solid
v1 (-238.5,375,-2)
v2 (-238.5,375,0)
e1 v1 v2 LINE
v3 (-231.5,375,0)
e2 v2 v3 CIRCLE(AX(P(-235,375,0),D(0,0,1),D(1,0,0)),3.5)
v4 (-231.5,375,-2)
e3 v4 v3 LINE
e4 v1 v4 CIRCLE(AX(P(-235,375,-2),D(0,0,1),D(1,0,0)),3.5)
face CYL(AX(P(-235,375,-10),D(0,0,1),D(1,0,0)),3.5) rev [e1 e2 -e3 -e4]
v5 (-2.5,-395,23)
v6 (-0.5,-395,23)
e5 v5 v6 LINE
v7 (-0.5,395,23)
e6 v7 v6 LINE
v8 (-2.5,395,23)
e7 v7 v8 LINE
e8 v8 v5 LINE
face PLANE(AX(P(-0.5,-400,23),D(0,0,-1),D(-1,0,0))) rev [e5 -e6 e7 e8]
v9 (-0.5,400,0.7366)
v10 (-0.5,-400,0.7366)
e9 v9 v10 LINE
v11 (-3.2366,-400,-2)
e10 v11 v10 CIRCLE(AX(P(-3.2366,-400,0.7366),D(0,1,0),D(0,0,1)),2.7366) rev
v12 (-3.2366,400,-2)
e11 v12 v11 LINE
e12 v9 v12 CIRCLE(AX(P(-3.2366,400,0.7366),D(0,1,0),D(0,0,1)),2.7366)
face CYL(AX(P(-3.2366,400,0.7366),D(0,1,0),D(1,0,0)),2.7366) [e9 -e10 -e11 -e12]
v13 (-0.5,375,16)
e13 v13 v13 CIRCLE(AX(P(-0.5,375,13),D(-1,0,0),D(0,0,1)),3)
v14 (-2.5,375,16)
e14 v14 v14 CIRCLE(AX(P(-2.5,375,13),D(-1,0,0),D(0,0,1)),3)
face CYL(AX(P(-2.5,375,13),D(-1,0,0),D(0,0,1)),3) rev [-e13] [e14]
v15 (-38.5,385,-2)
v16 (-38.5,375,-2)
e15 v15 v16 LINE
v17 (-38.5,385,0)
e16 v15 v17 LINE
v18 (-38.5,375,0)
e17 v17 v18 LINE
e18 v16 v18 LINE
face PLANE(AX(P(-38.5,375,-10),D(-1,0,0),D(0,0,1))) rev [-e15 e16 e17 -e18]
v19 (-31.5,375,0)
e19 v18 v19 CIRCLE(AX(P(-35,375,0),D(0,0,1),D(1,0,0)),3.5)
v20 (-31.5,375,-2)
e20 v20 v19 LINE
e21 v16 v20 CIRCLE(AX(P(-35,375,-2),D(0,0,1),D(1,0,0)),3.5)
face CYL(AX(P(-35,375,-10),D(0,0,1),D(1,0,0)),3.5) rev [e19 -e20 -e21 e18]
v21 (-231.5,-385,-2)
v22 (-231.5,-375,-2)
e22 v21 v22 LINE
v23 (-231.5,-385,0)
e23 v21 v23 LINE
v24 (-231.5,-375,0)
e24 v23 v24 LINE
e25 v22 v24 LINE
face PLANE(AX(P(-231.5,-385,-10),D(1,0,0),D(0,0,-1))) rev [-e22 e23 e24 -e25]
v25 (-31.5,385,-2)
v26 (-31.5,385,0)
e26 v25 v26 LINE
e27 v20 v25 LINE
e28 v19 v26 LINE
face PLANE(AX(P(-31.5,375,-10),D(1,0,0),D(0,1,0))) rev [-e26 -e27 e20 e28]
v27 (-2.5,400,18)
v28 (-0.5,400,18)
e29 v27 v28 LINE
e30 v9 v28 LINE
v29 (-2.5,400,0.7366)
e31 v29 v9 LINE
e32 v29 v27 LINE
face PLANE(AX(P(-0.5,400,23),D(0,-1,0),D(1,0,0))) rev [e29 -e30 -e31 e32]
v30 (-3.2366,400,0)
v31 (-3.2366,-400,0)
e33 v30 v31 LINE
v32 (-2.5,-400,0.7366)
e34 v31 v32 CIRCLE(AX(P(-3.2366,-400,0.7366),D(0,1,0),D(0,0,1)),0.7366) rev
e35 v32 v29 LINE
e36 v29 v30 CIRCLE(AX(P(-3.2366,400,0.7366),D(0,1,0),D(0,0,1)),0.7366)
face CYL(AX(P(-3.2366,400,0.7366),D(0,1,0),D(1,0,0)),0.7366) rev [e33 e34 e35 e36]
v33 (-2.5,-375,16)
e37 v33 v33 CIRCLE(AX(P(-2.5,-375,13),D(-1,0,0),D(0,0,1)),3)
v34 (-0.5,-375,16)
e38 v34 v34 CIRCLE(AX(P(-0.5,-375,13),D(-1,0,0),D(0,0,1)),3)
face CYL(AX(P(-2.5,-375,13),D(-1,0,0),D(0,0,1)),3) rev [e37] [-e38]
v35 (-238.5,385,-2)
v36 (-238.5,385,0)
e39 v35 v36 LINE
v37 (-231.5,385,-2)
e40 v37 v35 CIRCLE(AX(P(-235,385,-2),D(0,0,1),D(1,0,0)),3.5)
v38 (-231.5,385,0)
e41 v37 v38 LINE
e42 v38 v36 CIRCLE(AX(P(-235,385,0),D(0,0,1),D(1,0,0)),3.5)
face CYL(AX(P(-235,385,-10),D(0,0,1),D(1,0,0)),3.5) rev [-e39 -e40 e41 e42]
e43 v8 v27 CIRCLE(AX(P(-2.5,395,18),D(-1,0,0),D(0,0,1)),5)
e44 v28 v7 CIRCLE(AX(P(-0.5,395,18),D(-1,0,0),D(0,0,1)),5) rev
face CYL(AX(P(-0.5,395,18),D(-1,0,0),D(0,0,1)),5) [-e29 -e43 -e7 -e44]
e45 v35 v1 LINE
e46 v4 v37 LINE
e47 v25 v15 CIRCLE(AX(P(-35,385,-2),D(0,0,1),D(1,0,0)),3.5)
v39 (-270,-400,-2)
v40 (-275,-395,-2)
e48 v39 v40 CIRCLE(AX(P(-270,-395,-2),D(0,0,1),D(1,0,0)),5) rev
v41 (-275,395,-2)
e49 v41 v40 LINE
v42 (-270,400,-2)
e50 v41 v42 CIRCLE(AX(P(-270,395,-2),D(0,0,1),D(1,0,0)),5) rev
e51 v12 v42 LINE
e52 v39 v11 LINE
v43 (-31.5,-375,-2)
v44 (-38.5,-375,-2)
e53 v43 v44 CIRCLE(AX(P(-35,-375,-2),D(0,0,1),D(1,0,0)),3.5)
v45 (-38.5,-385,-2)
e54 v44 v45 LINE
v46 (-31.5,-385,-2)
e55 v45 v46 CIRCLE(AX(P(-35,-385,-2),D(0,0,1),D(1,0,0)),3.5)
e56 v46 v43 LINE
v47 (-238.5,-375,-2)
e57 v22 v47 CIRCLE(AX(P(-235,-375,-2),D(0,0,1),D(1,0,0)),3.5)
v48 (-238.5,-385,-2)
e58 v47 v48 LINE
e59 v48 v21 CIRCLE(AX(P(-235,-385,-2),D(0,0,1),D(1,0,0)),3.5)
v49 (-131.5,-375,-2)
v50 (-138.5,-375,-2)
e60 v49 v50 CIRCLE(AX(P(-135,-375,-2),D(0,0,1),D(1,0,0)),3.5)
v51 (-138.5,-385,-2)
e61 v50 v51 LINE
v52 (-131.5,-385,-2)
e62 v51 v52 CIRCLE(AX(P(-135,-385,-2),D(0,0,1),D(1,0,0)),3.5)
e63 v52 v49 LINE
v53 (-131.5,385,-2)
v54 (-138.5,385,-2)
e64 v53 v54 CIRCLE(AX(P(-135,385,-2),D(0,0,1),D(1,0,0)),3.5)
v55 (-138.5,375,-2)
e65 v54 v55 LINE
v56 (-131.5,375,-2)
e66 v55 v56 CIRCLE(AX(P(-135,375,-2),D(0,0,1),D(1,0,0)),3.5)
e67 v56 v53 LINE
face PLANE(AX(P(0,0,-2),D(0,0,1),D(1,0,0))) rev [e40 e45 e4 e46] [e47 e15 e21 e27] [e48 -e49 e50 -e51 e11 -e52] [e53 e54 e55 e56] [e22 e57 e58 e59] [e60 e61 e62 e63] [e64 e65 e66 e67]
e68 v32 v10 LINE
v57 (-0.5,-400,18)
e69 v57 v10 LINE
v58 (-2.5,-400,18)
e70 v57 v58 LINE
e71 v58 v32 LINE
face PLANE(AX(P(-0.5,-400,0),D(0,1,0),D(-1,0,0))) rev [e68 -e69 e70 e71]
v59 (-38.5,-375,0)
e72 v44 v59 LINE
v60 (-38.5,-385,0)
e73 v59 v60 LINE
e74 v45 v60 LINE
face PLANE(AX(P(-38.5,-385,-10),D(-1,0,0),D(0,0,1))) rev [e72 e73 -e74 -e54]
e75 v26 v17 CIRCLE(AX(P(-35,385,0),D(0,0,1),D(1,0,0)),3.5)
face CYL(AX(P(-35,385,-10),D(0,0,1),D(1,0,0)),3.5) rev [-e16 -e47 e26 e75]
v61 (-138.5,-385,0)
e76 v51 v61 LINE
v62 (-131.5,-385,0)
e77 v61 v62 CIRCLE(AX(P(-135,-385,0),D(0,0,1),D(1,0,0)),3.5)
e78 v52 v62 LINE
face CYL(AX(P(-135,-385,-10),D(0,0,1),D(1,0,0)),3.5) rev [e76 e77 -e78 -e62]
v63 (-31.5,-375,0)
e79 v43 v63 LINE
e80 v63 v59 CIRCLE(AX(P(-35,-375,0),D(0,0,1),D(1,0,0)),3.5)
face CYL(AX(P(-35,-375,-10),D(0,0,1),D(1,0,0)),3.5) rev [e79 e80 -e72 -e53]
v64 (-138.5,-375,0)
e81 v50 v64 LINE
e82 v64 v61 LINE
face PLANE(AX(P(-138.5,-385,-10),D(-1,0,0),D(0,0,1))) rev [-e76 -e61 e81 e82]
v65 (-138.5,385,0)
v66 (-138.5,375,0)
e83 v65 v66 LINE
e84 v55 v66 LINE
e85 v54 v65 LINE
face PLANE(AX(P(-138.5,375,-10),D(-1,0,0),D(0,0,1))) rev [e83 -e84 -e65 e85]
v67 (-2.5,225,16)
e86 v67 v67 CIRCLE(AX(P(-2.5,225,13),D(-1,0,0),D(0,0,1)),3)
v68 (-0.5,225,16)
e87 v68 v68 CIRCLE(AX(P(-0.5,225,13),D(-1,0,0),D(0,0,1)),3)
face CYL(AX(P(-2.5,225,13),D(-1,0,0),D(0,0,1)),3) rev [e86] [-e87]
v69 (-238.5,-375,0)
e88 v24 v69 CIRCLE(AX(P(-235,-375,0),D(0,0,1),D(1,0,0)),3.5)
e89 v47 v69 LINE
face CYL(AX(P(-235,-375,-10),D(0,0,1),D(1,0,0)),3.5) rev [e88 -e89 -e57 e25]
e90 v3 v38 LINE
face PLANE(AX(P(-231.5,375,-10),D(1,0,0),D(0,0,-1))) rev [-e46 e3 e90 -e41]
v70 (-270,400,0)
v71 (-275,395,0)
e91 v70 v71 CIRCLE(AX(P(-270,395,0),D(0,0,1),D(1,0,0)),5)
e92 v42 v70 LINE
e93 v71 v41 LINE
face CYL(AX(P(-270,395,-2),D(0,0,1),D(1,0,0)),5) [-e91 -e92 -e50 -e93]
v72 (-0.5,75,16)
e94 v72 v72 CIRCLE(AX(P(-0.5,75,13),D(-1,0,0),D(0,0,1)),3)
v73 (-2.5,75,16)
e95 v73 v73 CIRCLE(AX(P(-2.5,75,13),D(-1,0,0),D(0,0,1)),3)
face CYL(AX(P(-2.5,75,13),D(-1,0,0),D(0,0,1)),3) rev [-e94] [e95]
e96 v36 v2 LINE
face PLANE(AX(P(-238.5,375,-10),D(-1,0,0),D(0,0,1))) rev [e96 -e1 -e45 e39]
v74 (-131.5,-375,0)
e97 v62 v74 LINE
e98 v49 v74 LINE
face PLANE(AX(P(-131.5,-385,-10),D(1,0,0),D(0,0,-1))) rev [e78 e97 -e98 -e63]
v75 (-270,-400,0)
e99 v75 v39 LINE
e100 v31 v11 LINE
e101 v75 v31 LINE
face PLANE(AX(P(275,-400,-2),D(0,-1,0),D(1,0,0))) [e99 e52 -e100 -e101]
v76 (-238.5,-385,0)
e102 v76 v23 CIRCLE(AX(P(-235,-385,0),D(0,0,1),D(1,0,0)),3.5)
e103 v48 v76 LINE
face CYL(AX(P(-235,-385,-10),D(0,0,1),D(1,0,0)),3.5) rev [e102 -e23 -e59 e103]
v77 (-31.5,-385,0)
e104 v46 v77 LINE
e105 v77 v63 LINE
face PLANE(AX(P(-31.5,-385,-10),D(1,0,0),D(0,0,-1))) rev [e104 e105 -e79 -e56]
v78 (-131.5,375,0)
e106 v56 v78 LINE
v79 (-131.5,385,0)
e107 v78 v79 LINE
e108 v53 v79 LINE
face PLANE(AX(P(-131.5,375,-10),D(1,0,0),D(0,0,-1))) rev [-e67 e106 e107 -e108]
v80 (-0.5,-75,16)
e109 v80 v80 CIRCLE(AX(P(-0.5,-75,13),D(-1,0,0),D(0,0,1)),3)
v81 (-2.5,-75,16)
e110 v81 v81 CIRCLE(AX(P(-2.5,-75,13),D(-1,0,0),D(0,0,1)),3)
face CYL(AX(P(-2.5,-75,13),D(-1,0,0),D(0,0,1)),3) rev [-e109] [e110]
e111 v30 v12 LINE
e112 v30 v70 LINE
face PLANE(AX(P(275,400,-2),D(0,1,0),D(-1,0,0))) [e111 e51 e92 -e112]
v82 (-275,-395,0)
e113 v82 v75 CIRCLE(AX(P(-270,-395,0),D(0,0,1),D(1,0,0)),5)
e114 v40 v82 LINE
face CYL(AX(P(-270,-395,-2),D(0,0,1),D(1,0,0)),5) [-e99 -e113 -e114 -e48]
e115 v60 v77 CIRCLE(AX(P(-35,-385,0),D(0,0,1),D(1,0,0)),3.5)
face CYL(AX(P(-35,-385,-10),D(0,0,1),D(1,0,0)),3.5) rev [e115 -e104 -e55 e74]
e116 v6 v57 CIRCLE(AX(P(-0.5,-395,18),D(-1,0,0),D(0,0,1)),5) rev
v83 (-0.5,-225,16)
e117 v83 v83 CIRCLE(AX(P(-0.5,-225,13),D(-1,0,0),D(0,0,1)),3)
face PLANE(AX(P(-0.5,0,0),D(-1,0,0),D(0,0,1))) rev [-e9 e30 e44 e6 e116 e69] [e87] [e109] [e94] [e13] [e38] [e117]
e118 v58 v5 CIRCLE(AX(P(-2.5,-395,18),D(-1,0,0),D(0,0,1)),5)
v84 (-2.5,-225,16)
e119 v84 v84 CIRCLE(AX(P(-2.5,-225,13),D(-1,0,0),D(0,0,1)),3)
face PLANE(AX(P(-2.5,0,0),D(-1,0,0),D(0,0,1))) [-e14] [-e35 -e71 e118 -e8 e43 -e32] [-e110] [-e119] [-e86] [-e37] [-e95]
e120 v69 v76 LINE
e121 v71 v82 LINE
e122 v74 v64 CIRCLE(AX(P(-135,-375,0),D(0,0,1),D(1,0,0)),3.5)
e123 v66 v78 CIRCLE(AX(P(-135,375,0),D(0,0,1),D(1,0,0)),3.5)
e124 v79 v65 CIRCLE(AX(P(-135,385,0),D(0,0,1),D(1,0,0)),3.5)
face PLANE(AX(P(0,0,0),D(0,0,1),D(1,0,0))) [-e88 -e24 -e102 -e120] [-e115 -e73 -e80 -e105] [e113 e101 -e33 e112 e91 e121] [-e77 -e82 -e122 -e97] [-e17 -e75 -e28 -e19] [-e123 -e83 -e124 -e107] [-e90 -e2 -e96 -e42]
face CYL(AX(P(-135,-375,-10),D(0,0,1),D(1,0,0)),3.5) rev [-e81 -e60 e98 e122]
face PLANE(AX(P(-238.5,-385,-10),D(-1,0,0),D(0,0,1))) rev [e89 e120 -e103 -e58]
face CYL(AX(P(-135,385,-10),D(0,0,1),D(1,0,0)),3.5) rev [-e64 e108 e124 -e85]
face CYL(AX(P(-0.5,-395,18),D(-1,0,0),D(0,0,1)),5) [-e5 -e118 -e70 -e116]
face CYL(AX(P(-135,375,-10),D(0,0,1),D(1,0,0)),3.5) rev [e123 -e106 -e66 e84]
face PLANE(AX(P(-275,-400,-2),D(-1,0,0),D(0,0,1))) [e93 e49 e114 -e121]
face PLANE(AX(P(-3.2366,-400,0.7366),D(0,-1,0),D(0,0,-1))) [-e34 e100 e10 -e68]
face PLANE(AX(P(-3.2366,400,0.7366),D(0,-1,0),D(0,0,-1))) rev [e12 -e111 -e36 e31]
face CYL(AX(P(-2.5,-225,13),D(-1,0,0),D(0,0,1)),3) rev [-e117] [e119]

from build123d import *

# Parameters (mm, degrees)
SKETCH_1_W                       = 550
SKETCH_1_H                       = 800
SM_BASE_FLANGE_1_DEPTH           = 2
SKETCH_6_W                       = 40
SKETCH_6_H                       = 130
CUT_EXTRUDE_1_DEPTH              = 10
FILLET_1_R                       = 5
SKETCH_7_W                       = 1
SKETCH_7_H                       = 845.505579408
CUT_EXTRUDE_2_DEPTH              = 10
SKETCH_8_W                       = 313.779033263
SKETCH_8_H                       = 811.185879887
CUT_EXTRUDE_3_DEPTH              = 10
SM_EDGE_FLANGE_1_STRIP_W         = 9.4732
SM_EDGE_FLANGE_1_STRIP_H         = 2
SM_EDGE_FLANGE_1_STRIP_CUT_DEPTH = 800
SM_EDGE_FLANGE_1_DEPTH           = 800
FILLET_2_R                       = 5
HOLE_WIZARD_7_0_7_1_D            = 7
CUT_EXTRUDE_4_DEPTH              = 10
HOLE_WIZARD_6_0_6_1_D            = 6
PATTERN_LINEAR_1_COUNT           = 6
PATTERN_LINEAR_1_PITCH           = 150


# Sheet-metal steps are written as plain solids
with BuildPart() as part:
    # Sketch 1 → 基体-法兰1 (new body)
    with BuildSketch(Plane.XY):
        Rectangle(SKETCH_1_W, SKETCH_1_H)
    extrude(amount=-SM_BASE_FLANGE_1_DEPTH)

    # 草图6 → 切除-拉伸1 (cut)
    with BuildSketch(Plane.XY):
        with Locations((255, 335)):
            Rectangle(SKETCH_6_W, SKETCH_6_H)
        with Locations((255, -335)):
            Rectangle(SKETCH_6_W, SKETCH_6_H)
    extrude(amount=-CUT_EXTRUDE_1_DEPTH, mode=Mode.SUBTRACT)

    # 圆角1
    fillet_1_edges = [part.edges().sort_by_distance(p)[0] for p in [
        (275, 270, -1),
        (235, 270, -1),
        (235, 400, -1),
        (275, -270, -1),
        (235, -400, -1),
        (235, -270, -1),
        (-275, 400, -1),
        (-275, -400, -1),
    ]]
    fillet(fillet_1_edges, radius=FILLET_1_R)

    # 草图7 → 切除-拉伸2 (cut)
    with BuildSketch(Plane.XY):
        Rectangle(SKETCH_7_W, SKETCH_7_H)
    extrude(amount=-CUT_EXTRUDE_2_DEPTH, mode=Mode.SUBTRACT)


with BuildPart() as cut_extrude_2_piece_1:
    # of the separate pieces the step leaves, piece 1, a body of its own (cut_extrude_2_pieces)
    add(part.part.solids().sort_by_distance((-0.5, -400, 0))[0])

    # 边线-法兰1 strip (across the edge) → 边线-法兰1 strip cut (cut)
    with BuildSketch(Plane(origin=(-0.5, -400, 0), x_dir=(-1, 0, 0), z_dir=(0, 1, 0))):
        with Locations((-2, -1)):
            Rectangle(SM_EDGE_FLANGE_1_STRIP_W, SM_EDGE_FLANGE_1_STRIP_H)
    extrude(amount=SM_EDGE_FLANGE_1_STRIP_CUT_DEPTH, mode=Mode.SUBTRACT)

    # 边线-法兰1 section (across the edge) → 边线-法兰1 (add)
    with BuildSketch(Plane(origin=(-0.5, -400, 0), x_dir=(-1, 0, 0), z_dir=(0, 1, 0))):
        with BuildLine():
            Line((0, 0.7366), (0, 23))
            Line((0, 23), (2, 23))
            Line((2, 23), (2, 0.7366))
            ThreePointArc((2, 0.7366), (2.215745145, 0.215745145), (2.7366, 0))
            Line((2.7366, 0), (2.7366, -2))
            ThreePointArc((2.7366, -2), (0.801531583, -1.198468417), (0, 0.7366))
        make_face()
    extrude(amount=SM_EDGE_FLANGE_1_DEPTH)

    # 圆角2
    fillet_2_edges = [cut_extrude_2_piece_1.edges().sort_by_distance(p)[0] for p in [
        (-1.5, -400, 23),
        (-1.5, 400, 23),
    ]]
    fillet(fillet_2_edges, radius=FILLET_2_R)

    # Ø7.0 (7) 直径孔1 (through all)
    with Locations(Plane.XY):
        with Locations((-235, 380), (-135, 380), (-35, 380), (-35, -380), (-135, -380), (-235, -380)):
            Hole(HOLE_WIZARD_7_0_7_1_D / 2)

    # 草图15 → 切除-拉伸4 (cut)
    with BuildSketch(Plane.XY):
        with BuildLine():
            Line((-238.5, 375), (-238.5, 385))
            ThreePointArc((-238.5, 385), (-235, 388.5), (-231.5, 385))
            Line((-231.5, 385), (-231.5, 375))
            ThreePointArc((-231.5, 375), (-235, 371.5), (-238.5, 375))
        make_face()
        with BuildLine():
            Line((-138.5, 375), (-138.5, 385))
            ThreePointArc((-138.5, 385), (-135, 388.5), (-131.5, 385))
            Line((-131.5, 385), (-131.5, 375))
            ThreePointArc((-131.5, 375), (-135, 371.5), (-138.5, 375))
        make_face()
        with BuildLine():
            Line((-38.5, 375), (-38.5, 385))
            ThreePointArc((-38.5, 385), (-35, 388.5), (-31.5, 385))
            Line((-31.5, 385), (-31.5, 375))
            ThreePointArc((-31.5, 375), (-35, 371.5), (-38.5, 375))
        make_face()
        with BuildLine():
            Line((-238.5, -385), (-238.5, -375))
            ThreePointArc((-238.5, -375), (-235, -371.5), (-231.5, -375))
            Line((-231.5, -375), (-231.5, -385))
            ThreePointArc((-231.5, -385), (-235, -388.5), (-238.5, -385))
        make_face()
        with BuildLine():
            Line((-138.5, -385), (-138.5, -375))
            ThreePointArc((-138.5, -375), (-135, -371.5), (-131.5, -375))
            Line((-131.5, -375), (-131.5, -385))
            ThreePointArc((-131.5, -385), (-135, -388.5), (-138.5, -385))
        make_face()
        with BuildLine():
            Line((-38.5, -385), (-38.5, -375))
            ThreePointArc((-38.5, -375), (-35, -371.5), (-31.5, -375))
            Line((-31.5, -375), (-31.5, -385))
            ThreePointArc((-31.5, -385), (-35, -388.5), (-38.5, -385))
        make_face()
    extrude(amount=-CUT_EXTRUDE_4_DEPTH, mode=Mode.SUBTRACT)

    # Ø6.0 (6) 直径孔1 (through all)
    with Locations(Plane.ZY.offset(2.5)):
        with Locations((13, 375)):
            hole_wizard_6_0_6_1 = Hole(HOLE_WIZARD_6_0_6_1_D / 2)

    # 阵列(线性)1: Ø6.0 (6) 直径孔1 ×6
    with Locations(*[(0, -i * PATTERN_LINEAR_1_PITCH, 0) for i in range(1, PATTERN_LINEAR_1_COUNT)]):
        add(hole_wizard_6_0_6_1, mode=Mode.SUBTRACT)


with BuildPart() as cut_extrude_2_piece_2:
    # of the separate pieces the step leaves, piece 2, a body of its own (cut_extrude_2_pieces)
    add(part.part.solids().sort_by_distance((230, -400, 0))[0])

    # 草图8 → 切除-拉伸3 (cut)
    with BuildSketch(Plane.XY):
        with Locations((157.389516632, -5.592939943)):
            Rectangle(SKETCH_8_W, SKETCH_8_H)
    extrude(amount=-CUT_EXTRUDE_3_DEPTH, mode=Mode.SUBTRACT)


solid = cut_extrude_2_piece_1.part
